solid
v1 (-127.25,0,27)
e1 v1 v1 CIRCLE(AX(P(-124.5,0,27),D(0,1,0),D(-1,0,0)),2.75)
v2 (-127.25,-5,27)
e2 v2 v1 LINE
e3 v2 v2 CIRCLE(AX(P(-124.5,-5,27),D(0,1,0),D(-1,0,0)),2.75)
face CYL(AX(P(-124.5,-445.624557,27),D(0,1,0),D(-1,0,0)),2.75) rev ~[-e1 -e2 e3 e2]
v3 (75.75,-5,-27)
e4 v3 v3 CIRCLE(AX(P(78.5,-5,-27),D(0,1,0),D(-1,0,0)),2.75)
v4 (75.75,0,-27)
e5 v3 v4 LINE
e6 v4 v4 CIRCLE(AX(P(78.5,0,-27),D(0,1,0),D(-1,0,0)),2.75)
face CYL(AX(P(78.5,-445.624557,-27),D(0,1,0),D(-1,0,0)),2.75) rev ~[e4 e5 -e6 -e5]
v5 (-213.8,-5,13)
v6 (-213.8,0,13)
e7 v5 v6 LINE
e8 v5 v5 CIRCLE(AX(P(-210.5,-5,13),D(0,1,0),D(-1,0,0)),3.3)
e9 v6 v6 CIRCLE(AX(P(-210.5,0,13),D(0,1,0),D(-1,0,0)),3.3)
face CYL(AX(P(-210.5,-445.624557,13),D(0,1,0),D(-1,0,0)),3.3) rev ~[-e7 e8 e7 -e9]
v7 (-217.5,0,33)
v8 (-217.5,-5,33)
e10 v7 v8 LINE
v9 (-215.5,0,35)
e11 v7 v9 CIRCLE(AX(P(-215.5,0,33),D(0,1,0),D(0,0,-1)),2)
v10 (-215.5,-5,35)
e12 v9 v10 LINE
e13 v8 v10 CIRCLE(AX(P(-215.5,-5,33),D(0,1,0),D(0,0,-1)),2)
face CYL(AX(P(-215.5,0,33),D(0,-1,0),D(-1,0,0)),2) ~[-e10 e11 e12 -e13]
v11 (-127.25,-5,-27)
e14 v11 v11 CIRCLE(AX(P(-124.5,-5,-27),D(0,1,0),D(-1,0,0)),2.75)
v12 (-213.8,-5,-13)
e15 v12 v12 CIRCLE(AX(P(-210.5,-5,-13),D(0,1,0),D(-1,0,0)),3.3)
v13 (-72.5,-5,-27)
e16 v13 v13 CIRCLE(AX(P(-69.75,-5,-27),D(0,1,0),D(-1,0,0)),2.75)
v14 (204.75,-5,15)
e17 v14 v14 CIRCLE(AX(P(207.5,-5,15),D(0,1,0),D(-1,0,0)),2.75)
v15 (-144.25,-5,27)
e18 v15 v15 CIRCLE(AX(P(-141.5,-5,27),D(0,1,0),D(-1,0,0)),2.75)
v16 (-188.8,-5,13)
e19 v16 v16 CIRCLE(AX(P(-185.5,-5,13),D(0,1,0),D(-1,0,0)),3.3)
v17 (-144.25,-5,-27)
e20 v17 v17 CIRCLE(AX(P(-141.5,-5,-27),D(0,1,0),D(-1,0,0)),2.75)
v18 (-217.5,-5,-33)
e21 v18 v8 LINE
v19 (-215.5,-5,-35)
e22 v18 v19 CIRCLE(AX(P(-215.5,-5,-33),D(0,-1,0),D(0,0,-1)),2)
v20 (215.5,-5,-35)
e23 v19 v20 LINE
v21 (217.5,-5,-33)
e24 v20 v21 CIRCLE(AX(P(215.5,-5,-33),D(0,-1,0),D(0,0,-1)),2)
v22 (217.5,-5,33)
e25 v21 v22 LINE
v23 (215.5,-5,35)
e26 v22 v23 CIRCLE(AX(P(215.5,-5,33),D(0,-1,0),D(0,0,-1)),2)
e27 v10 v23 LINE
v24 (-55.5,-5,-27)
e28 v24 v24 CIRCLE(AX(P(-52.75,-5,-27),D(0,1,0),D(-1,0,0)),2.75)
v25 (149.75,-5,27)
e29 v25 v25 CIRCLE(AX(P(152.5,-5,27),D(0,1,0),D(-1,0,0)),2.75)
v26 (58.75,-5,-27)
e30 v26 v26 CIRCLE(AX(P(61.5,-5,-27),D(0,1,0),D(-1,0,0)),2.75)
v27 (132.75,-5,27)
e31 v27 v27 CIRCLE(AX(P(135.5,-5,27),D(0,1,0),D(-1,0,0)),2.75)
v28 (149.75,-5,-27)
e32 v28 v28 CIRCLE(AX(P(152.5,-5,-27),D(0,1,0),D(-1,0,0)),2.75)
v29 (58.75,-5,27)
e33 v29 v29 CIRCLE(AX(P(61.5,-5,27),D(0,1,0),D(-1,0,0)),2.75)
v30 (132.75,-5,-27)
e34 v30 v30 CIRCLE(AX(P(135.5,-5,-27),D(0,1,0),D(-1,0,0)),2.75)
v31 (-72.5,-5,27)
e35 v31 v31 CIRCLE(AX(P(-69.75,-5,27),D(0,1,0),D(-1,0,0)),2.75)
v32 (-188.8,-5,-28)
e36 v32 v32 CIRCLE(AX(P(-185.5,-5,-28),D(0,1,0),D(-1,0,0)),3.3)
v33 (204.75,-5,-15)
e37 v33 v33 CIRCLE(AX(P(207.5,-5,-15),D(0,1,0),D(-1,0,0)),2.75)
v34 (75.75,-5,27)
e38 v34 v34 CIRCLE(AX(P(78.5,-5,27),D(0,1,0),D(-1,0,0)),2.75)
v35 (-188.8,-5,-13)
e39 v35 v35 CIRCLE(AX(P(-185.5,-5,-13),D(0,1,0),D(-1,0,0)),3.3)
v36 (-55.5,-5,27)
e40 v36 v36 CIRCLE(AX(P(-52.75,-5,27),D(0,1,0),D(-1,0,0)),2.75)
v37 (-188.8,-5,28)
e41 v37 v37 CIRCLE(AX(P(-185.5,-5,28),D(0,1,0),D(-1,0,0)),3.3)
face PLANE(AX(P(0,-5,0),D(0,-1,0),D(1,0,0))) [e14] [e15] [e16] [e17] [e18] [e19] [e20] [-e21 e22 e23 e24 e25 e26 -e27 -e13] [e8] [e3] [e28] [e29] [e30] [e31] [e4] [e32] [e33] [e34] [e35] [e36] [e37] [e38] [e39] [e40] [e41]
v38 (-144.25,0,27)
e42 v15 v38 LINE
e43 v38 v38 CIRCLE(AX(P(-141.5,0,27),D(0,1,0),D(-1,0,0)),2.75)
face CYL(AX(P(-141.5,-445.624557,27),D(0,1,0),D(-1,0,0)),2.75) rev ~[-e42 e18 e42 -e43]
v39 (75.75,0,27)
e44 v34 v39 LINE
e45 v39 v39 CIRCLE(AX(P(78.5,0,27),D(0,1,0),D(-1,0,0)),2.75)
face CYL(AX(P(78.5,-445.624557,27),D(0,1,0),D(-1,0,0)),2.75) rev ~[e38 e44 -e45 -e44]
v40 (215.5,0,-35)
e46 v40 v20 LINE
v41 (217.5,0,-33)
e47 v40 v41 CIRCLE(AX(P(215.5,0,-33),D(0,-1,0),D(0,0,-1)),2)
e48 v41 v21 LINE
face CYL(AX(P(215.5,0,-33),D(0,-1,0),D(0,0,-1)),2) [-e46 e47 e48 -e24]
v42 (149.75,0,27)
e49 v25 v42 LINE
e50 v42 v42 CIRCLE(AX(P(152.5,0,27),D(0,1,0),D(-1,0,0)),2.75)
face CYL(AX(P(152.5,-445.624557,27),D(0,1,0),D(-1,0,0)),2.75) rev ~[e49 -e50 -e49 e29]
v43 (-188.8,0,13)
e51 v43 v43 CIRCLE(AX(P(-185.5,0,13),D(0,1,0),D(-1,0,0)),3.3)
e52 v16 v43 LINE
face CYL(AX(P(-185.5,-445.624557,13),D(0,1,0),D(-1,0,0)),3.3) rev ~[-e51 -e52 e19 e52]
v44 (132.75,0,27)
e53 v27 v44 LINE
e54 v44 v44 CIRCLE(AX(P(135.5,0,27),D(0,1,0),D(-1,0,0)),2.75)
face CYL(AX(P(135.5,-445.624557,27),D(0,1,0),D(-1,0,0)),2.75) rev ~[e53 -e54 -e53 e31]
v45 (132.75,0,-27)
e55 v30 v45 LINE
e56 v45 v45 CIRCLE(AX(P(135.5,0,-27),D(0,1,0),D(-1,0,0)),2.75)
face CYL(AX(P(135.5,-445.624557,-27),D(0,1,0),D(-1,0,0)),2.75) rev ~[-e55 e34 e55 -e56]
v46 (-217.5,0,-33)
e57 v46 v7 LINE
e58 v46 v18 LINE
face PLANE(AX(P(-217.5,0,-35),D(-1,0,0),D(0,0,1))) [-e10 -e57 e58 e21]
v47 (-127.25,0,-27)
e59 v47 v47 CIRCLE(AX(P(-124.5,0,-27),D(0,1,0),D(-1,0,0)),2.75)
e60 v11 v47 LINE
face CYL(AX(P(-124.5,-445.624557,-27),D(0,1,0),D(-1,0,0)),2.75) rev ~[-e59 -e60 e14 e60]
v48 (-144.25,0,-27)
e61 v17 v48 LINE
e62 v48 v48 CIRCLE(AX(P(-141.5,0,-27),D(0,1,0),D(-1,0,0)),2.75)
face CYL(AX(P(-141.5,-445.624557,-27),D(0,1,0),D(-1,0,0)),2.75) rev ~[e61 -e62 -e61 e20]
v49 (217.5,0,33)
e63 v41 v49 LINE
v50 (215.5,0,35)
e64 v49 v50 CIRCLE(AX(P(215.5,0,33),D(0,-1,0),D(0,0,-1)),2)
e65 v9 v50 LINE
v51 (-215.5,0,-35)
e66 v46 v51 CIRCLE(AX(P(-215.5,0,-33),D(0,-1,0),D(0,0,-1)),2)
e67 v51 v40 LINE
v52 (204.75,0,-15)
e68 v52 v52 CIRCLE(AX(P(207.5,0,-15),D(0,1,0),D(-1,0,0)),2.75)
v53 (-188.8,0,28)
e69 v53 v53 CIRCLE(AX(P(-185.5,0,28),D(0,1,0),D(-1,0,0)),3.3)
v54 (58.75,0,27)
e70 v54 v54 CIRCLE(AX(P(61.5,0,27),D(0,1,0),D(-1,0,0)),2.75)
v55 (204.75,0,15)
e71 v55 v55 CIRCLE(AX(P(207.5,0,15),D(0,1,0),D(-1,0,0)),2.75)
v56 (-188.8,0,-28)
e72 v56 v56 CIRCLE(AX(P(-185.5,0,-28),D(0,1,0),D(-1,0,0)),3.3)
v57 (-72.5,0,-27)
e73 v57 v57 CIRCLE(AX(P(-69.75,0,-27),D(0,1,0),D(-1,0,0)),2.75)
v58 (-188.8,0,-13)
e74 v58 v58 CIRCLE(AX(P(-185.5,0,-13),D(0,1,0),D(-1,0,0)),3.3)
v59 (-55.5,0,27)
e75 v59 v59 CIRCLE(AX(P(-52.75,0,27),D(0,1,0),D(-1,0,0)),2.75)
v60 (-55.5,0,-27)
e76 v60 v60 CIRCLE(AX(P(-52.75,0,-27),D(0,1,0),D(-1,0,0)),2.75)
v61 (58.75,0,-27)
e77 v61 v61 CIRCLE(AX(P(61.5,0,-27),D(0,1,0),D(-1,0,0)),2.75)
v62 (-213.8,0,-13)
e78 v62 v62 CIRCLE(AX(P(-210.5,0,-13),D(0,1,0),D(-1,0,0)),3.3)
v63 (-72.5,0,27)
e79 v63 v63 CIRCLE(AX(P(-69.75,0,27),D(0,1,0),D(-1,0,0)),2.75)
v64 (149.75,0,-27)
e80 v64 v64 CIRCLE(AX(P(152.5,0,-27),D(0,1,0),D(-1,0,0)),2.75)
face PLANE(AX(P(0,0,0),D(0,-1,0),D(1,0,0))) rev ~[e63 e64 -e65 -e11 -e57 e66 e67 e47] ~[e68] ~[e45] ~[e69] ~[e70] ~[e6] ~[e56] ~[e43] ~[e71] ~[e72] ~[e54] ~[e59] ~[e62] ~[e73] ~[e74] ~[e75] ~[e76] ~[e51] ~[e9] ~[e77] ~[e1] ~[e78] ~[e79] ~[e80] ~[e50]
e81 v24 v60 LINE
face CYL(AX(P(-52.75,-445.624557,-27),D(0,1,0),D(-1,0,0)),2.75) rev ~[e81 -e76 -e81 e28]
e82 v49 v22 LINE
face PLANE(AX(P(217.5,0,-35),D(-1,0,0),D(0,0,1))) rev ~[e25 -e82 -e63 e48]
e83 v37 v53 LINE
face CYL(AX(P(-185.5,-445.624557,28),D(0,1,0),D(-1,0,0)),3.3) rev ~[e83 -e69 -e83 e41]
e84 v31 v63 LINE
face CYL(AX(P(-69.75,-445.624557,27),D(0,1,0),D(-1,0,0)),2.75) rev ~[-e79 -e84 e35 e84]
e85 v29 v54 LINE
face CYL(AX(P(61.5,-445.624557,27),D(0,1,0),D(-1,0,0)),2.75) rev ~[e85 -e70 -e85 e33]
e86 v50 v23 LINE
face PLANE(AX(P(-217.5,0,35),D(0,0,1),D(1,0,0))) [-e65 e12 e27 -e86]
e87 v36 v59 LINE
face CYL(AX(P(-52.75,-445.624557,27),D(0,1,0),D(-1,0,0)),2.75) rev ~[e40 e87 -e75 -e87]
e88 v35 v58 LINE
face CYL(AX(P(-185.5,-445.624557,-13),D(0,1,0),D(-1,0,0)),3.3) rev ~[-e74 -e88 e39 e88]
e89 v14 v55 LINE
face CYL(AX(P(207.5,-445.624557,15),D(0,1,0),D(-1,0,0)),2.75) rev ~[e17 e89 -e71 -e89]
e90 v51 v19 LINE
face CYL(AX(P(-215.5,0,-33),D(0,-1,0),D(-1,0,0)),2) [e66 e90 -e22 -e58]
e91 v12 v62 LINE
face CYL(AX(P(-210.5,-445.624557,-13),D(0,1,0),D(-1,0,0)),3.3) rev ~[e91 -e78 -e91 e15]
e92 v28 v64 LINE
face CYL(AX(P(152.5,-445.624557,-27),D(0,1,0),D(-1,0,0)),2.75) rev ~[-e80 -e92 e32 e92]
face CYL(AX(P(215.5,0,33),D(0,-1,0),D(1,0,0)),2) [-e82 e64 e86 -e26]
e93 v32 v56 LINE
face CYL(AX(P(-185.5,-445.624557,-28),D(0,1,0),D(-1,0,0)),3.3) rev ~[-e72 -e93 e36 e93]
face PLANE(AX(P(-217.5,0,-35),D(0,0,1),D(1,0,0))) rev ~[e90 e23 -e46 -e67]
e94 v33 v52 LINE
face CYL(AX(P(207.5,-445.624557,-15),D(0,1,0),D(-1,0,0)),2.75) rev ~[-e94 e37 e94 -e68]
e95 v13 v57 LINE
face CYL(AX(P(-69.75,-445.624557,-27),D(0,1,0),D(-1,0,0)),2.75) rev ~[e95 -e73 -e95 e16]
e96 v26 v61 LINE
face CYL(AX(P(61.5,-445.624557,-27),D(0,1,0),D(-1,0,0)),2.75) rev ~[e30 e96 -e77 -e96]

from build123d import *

# Parameters (mm, degrees)
F0_W     = 435
F0_H     = 70
F1_DEPTH = 5
F2_R     = 2
F4_D     = 6.6
F6_D     = 5.5
F8_D     = 5.5
F10_D    = 5.5


# Not quite as in the source:
# - a feature names something its author has since deleted; it is built from what else it names


with BuildPart() as f1:
    # F0 (on Front) → F1 (new body)
    with BuildSketch(Plane.XZ):
        Rectangle(F0_W, F0_H)
    extrude(amount=F1_DEPTH)

    # F2
    f2_edges = [f1.edges().sort_by_distance(p)[0] for p in [
        (217.5, -2.5, 35),
        (217.5, -2.5, -35),
        (-217.5, -2.5, 35),
        (-217.5, -2.5, -35),
    ]]
    fillet(f2_edges, radius=F2_R)

    # F4 (through all)
    with Locations(Plane.XZ.offset(5)):
        with Locations((-185.5, 13), (-210.5, 13), (-210.5, -13), (-185.5, -13), (-185.5, 28), (-185.5, -28)):
            Hole(F4_D / 2)

    # F6 (through all)
    with Locations(Plane.XZ.offset(5)):
        with Locations((-141.5, 27), (-124.5, 27), (-141.5, -27), (-124.5, -27)):
            Hole(F6_D / 2)

    # F8 (through all)
    with Locations(Plane.XZ.offset(5)):
        with Locations((-69.75, 27), (-52.75, 27), (-69.75, -27), (-52.75, -27), (61.5, 27), (78.5, 27), (61.5, -27), (78.5, -27), (135.5, 27), (152.5, 27), (135.5, -27), (152.5, -27)):
            Hole(F8_D / 2)

    # F10 (through all)
    with Locations(Plane.XZ.offset(5)):
        with Locations((207.5, 15), (207.5, -15)):
            Hole(F10_D / 2)


solid = f1.part
